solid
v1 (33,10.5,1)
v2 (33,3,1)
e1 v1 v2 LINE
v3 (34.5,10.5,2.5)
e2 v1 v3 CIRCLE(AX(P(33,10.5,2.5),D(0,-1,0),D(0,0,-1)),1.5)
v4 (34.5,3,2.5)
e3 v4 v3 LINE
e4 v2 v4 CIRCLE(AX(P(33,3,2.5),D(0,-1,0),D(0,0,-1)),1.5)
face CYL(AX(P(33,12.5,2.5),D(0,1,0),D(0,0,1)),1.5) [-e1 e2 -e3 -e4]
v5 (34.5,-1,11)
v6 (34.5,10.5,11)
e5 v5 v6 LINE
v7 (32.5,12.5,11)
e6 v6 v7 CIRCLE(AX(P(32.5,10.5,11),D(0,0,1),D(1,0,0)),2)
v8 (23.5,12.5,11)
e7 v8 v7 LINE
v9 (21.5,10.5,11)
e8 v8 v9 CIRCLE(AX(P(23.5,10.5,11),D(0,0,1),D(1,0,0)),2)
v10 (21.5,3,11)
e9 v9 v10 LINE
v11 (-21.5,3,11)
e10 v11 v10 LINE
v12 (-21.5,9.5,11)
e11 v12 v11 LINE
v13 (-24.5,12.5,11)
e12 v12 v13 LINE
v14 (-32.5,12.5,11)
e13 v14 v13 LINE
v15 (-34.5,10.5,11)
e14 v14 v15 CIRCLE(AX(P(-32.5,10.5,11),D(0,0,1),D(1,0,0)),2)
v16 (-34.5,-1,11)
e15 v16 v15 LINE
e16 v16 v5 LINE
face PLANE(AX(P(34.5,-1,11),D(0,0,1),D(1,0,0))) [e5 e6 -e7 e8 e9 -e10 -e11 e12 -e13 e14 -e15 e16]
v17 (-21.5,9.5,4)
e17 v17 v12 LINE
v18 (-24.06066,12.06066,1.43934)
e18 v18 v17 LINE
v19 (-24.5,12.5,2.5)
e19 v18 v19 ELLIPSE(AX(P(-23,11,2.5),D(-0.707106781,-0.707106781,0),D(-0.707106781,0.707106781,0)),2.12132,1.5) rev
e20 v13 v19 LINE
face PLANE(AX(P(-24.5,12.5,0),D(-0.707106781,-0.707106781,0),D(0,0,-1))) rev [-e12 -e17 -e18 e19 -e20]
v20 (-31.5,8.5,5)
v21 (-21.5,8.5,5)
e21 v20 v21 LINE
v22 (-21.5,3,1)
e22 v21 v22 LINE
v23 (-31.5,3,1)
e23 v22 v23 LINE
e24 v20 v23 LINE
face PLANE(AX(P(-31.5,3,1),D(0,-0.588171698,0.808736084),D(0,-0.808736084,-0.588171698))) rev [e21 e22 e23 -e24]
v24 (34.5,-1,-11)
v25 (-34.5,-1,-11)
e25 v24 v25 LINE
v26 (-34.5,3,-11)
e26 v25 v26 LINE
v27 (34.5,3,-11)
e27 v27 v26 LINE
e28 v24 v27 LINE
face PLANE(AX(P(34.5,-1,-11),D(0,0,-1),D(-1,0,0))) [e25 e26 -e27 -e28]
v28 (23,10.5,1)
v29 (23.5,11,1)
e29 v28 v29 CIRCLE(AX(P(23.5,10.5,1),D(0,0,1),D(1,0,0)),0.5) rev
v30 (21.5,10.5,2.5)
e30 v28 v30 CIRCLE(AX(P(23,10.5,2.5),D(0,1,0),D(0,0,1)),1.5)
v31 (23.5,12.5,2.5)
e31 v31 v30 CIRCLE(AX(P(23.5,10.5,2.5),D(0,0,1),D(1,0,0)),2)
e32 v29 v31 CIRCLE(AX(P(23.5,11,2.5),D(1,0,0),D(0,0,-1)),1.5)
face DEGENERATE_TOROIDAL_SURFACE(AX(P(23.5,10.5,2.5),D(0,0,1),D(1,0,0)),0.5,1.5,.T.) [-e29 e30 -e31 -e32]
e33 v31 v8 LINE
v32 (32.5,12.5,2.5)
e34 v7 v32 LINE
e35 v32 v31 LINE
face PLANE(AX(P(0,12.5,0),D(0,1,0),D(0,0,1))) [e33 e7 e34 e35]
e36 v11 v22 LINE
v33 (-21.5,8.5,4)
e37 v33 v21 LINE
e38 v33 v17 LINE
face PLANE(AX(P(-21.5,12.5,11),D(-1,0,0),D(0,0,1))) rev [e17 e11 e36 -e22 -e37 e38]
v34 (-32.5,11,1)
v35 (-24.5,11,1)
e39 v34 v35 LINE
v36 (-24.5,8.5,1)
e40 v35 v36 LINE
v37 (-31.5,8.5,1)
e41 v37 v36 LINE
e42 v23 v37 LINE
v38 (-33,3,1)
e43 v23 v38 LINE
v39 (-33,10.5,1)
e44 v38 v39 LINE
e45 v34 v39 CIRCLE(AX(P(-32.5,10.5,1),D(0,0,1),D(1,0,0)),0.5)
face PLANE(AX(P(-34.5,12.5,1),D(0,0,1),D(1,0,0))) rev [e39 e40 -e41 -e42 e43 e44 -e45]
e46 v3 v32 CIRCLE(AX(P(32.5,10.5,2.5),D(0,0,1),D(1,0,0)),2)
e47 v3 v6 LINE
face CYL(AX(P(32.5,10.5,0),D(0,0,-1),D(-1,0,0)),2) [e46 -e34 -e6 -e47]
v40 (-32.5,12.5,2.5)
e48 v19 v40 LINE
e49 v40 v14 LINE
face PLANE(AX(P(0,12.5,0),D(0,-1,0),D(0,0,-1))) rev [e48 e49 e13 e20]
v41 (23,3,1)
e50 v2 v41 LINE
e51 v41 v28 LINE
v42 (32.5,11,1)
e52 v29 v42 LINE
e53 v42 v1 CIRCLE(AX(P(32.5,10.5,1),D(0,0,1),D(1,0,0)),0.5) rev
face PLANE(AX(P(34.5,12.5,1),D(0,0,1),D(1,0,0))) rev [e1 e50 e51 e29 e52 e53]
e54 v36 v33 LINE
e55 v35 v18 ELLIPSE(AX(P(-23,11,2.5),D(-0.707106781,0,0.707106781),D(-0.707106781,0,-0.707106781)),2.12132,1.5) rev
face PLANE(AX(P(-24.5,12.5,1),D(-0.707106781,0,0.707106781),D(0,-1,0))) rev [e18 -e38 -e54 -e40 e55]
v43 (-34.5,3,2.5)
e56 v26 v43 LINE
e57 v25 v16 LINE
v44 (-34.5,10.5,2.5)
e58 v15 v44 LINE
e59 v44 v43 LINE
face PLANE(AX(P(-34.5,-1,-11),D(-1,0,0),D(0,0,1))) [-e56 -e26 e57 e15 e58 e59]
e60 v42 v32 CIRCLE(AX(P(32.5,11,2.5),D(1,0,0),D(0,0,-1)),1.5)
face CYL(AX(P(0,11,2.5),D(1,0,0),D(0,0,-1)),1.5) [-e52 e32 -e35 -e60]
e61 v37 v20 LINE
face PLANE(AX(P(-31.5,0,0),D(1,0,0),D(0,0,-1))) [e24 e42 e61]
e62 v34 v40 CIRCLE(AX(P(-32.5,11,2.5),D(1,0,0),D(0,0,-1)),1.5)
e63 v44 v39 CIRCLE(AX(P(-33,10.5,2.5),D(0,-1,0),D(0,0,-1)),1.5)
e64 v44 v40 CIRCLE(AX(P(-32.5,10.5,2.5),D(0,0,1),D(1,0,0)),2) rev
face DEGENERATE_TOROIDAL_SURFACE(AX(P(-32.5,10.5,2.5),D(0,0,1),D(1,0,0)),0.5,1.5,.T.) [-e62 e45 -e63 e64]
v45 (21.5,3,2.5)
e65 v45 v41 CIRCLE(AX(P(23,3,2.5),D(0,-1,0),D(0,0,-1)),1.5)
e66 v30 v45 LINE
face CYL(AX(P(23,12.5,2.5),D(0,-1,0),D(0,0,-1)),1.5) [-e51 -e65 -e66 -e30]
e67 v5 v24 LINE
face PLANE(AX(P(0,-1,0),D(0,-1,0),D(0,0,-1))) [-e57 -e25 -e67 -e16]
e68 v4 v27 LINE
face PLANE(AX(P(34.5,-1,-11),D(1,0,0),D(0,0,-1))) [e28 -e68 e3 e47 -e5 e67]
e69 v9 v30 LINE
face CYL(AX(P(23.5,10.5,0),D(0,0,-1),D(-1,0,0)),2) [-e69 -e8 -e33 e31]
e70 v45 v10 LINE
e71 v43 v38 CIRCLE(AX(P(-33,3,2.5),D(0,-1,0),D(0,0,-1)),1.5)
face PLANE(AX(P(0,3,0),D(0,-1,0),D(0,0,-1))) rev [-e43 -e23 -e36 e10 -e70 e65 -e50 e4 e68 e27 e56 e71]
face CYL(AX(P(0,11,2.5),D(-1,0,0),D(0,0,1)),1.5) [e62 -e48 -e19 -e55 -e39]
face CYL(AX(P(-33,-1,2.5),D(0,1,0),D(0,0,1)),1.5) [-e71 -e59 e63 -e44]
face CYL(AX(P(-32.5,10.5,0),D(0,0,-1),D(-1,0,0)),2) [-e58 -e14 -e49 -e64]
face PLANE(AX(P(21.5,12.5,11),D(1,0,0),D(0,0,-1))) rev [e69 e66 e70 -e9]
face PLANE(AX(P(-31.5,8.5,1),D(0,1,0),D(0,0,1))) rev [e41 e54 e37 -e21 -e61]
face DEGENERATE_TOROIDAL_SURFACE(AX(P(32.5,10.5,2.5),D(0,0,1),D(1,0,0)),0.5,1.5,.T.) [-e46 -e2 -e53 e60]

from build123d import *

# Parameters (mm, degrees)
BOSS_EXTRUDE1_DEPTH      = 3
BOSS_EXTRUDE1_DEPTH_BACK = 1
SKETCH1_W                = 69
SKETCH1_H                = 22
SKETCH2_W                = 13
SKETCH2_H                = 10
BOSS_EXTRUDE2_DEPTH      = 9.5
CUT_EXTRUDE1_DEPTH       = 10
FILLET1_R                = 2
FILLET2_R                = 1.5
CHAMFER1_SIZE            = 3
FILLET3_R                = 1.5
FILLET4_R                = 2


with BuildPart() as part:
    # Sketch1 → Boss-Extrude1 (new, two sides: drawn at the far end of the back side and taken through both)
    with BuildSketch(Plane(origin=(0, 0, 0), x_dir=(1, 0, 0), z_dir=(0, 1, 0)).offset(-BOSS_EXTRUDE1_DEPTH_BACK)):
        Rectangle(SKETCH1_W, SKETCH1_H)
    extrude(amount=BOSS_EXTRUDE1_DEPTH + BOSS_EXTRUDE1_DEPTH_BACK)

    # Sketch2 → Boss-Extrude2 (add)
    with BuildSketch(Plane(origin=(0, 3, 0), x_dir=(1, 0, 0), z_dir=(0, 1, 0))):
        with Locations((-28, -6)):
            Rectangle(SKETCH2_W, SKETCH2_H)
        with Locations((28, -6)):
            Rectangle(SKETCH2_W, SKETCH2_H)
    extrude(amount=BOSS_EXTRUDE2_DEPTH)

    # Sketch3 → Cut-Extrude1 (cut)
    with BuildSketch(Plane(origin=(-21.5, 0, 0), x_dir=(0, 0, -1), z_dir=(1, 0, 0))):
        Polygon((-1, 3), (-1, 8.5), (-5, 8.5), align=None)
    extrude(amount=-CUT_EXTRUDE1_DEPTH, mode=Mode.SUBTRACT)

    # Fillet1
    fillet1_edges = [part.edges().sort_by_distance(p)[0] for p in [
        (34.5, 12.5, 6),
        (21.5, 12.5, 6),
    ]]
    fillet(fillet1_edges, radius=FILLET1_R)

    # Fillet2
    fillet2_edges = [part.edges().sort_by_distance(p)[0] for p in [
        (28, 12.5, 1),
        (21.5, 6.75, 1),
        (34.5, 6.75, 1),
        (33.914213562, 11.914213562, 1),
        (22.085786438, 11.914213562, 1),
    ]]
    fillet(fillet2_edges, radius=FILLET2_R)

    # Chamfer1
    chamfer1_edges = [part.edges().sort_by_distance(p)[0] for p in [
        (-21.5, 10.5, 1),
        (-21.5, 12.5, 6),
    ]]
    chamfer(chamfer1_edges, length=CHAMFER1_SIZE)

    # Fillet3
    fillet3_edges = [part.edges().sort_by_distance(p)[0] for p in [
        (-34.5, 7.75, 1),
        (-29.5, 12.5, 1),
    ]]
    fillet(fillet3_edges, radius=FILLET3_R)

    # Fillet4
    # the kernel refuses this fillet: 2 mm, written as the material it takes off along each edge
    with BuildSketch(Plane(origin=(-32.5, 10.5, 1), x_dir=(-1, 0, 0), z_dir=(0, -1, 0))) as fillet4_piece_1:
        with BuildLine():
            CenterArc((0.5, -1.5), 1.5, 0, 90)
            Line((2, -1.5), (2, 0))
            Line((2, 0), (0.5, 0))
        make_face()
    revolve(axis=Axis((-32.5, 10.5, 1), (0, 0, -1)), revolution_arc=90, mode=Mode.SUBTRACT)
    with BuildSketch(Plane(origin=(-34.5, 12.5, 1), x_dir=(0, -1, 0), z_dir=(0, 0, 1))) as fillet4_piece_2:
        with BuildLine():
            CenterArc((FILLET4_R, FILLET4_R), FILLET4_R, 180, 90)
            Line((0, FILLET4_R), (0, 0))
            Line((0, 0), (FILLET4_R, 0))
        make_face()
    extrude(amount=15, mode=Mode.SUBTRACT)


solid = part.part
